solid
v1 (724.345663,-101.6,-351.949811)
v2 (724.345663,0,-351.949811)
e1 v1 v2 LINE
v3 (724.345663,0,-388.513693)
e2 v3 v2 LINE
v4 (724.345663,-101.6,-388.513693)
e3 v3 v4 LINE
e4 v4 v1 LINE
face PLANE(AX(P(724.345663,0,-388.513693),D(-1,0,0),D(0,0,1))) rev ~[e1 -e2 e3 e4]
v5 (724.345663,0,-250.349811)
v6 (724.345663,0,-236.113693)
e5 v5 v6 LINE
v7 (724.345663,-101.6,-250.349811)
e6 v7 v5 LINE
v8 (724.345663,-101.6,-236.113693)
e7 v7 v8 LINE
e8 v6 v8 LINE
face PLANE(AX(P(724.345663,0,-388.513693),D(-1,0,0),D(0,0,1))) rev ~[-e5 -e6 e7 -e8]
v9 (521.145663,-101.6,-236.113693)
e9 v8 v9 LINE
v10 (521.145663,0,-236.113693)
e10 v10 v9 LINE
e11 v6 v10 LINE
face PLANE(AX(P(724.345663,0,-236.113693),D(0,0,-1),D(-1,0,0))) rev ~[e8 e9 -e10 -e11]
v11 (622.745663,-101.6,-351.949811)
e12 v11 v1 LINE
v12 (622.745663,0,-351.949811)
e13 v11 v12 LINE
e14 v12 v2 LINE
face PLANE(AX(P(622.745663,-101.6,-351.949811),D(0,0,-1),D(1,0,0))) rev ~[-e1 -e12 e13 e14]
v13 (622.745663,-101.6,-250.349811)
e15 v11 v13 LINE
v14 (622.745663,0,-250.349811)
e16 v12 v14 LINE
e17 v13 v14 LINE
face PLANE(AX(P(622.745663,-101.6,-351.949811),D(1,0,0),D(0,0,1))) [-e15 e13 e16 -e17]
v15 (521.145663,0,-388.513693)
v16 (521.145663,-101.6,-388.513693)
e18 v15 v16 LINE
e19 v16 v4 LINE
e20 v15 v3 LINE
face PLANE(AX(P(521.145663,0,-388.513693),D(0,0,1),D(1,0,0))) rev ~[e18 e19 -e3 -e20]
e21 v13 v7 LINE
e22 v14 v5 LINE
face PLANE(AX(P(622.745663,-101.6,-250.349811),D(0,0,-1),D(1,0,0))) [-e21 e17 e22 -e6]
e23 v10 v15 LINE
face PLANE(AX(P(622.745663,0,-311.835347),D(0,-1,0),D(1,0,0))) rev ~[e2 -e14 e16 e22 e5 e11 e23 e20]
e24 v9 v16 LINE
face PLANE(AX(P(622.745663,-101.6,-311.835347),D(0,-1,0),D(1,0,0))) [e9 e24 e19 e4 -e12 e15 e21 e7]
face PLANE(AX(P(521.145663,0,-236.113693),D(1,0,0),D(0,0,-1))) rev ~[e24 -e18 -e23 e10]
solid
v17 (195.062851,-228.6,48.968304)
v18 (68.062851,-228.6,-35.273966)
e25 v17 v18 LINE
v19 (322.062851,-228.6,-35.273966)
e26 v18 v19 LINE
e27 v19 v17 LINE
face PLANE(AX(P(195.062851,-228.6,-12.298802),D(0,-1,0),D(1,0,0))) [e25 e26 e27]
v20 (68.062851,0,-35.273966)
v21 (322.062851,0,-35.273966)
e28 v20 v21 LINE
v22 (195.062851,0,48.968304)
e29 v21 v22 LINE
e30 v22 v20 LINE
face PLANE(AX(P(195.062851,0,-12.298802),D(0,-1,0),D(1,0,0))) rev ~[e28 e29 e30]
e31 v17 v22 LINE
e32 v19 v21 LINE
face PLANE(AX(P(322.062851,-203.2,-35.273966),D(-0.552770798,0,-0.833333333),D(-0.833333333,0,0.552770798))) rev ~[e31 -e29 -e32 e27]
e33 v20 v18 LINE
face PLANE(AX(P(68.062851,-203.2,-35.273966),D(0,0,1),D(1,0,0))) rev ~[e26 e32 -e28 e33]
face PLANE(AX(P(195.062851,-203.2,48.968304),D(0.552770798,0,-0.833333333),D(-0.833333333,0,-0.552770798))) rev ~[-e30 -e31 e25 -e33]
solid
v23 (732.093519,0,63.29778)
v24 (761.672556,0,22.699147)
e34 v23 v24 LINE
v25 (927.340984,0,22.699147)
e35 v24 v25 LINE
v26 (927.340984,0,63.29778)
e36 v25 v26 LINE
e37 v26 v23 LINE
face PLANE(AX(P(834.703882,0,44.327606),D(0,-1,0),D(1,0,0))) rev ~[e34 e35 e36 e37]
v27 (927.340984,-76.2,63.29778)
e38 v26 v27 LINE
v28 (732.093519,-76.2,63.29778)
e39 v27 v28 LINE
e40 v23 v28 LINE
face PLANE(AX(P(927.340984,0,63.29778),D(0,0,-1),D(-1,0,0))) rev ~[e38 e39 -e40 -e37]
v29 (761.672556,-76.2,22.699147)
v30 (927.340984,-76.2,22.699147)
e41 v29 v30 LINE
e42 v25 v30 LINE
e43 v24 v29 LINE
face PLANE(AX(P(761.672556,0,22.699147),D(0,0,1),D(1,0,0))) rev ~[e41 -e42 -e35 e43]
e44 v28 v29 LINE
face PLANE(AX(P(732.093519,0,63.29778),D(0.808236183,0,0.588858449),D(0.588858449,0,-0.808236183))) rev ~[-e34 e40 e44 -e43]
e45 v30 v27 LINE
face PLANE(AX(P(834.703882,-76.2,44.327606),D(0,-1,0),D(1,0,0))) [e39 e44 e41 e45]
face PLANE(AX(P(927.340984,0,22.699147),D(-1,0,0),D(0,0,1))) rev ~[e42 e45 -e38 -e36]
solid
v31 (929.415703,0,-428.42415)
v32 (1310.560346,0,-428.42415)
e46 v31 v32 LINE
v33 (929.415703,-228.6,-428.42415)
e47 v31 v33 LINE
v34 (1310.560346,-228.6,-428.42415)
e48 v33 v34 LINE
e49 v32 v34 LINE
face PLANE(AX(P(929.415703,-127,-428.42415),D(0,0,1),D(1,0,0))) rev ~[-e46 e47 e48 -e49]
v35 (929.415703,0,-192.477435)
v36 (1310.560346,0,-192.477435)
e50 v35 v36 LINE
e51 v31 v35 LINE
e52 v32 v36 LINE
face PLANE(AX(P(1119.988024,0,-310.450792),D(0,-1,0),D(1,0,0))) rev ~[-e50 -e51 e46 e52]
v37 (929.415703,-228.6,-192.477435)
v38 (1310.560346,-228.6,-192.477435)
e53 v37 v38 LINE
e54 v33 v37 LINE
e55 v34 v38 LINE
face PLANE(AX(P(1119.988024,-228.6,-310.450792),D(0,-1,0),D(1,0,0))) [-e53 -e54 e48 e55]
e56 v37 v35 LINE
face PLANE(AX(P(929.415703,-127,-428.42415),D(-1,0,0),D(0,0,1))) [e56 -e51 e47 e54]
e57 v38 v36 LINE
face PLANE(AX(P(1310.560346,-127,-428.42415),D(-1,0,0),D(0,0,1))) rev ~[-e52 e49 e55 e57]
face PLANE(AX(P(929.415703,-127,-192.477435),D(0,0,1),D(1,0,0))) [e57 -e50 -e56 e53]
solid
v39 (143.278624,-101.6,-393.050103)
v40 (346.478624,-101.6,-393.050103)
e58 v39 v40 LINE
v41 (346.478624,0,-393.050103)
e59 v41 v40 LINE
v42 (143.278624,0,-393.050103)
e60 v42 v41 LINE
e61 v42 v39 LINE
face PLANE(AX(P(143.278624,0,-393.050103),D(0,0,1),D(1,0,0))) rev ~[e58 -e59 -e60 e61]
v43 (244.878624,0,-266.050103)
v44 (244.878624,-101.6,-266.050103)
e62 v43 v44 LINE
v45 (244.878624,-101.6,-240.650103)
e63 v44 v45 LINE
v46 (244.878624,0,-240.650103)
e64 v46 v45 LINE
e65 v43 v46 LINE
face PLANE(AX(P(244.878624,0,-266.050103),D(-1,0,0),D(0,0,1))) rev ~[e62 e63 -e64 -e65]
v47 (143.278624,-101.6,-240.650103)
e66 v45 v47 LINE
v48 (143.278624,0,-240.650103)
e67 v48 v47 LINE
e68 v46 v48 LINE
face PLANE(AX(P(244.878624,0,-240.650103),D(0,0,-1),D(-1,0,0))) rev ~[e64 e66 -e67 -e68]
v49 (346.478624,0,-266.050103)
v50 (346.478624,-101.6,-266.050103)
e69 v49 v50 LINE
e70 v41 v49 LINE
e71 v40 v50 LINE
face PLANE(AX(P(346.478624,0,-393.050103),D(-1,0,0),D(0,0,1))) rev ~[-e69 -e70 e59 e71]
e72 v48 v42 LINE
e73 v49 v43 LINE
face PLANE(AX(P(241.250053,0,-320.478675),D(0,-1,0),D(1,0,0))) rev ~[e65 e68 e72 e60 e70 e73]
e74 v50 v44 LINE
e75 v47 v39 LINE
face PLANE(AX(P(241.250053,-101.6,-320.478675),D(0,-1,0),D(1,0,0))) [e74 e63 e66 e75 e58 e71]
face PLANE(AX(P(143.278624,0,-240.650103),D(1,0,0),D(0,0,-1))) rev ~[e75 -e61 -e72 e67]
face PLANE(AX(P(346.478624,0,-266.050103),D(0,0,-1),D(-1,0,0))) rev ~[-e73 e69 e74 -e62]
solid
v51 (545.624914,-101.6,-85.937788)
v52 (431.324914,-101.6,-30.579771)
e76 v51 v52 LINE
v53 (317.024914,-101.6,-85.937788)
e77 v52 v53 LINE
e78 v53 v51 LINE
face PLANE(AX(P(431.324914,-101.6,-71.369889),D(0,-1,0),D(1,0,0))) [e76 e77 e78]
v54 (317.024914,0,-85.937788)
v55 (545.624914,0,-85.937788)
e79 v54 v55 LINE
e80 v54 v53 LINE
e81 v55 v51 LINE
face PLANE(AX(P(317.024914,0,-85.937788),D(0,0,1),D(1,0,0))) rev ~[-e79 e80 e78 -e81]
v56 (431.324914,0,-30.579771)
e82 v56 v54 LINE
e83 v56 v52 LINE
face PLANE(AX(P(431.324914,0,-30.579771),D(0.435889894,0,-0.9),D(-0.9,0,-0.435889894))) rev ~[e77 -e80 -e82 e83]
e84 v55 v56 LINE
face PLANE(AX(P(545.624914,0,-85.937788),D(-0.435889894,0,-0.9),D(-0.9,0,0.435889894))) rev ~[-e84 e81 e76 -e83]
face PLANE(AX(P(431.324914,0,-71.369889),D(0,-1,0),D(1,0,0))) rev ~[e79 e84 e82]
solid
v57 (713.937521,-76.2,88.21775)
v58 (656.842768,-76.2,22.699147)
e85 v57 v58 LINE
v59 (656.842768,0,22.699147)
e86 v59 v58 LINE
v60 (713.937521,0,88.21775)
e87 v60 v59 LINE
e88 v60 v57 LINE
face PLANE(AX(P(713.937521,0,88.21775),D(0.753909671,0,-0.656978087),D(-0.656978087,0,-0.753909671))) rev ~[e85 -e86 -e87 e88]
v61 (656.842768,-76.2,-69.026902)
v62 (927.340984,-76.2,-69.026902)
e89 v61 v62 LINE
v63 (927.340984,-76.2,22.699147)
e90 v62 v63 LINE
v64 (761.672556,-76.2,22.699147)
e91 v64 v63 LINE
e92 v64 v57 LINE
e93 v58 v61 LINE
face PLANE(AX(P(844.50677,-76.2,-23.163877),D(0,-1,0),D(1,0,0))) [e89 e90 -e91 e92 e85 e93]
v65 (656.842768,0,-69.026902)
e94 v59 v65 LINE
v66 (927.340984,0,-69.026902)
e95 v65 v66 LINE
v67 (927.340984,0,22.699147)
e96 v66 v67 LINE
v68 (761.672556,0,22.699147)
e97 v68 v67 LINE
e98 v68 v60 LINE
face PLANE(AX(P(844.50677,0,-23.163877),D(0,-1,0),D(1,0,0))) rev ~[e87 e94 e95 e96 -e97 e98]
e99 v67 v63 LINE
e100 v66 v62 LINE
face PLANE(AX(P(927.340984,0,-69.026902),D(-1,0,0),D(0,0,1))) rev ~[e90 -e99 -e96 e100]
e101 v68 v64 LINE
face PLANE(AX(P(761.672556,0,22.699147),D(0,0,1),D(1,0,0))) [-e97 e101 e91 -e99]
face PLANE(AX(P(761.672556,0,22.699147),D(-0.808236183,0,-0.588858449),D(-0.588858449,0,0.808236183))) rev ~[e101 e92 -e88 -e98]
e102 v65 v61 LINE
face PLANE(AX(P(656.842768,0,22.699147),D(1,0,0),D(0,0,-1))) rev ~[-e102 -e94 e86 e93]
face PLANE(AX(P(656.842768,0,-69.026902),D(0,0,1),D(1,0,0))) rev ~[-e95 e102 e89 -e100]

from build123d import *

# Parameters (mm, degrees)
F1_DEPTH  = 127
F4_DEPTH  = 76.2
F6_DEPTH  = 25.4
F8_DEPTH  = 101.6
F9_W      = 165.6684279442
F9_H      = 91.7260497808
F11_DEPTH = 76.2
F13_DEPTH = 101.6
F14_W     = 101.6
F14_H     = 101.6
F15_DEPTH = 101.6
F16_W     = 101.6
F16_H     = 101.6
F17_DEPTH = 127
F18_W     = 381.1446428299
F18_H     = 235.9467148781
F20_DEPTH = 127
F21_W     = 381.1446428299
F21_H     = 235.9467148781
F19_W     = 381.1446428299
F19_H     = 235.9467148781
F23_DEPTH = 101.6


with BuildPart() as f1:
    # F0 (on Front) → F1 (new body)
    with BuildSketch(Plane.XZ):
        Polygon((195.0628506741, 48.968303573), (68.0628506741, -35.273966102), (322.0628506741, -35.273966102), align=None)
    extrude(amount=F1_DEPTH)

    # F2 (on face) → F4 (join)
    with BuildSketch(Plane.XZ.offset(127)):
        Polygon((68.0628506741, -35.273966102), (322.0628506741, -35.273966102), (195.0628506741, 48.968303573), align=None)
    extrude(amount=F4_DEPTH)

    # F5 (on face) → F6 (join)
    with BuildSketch(Plane.XZ.offset(203.2)):
        Polygon((195.0628506741, 48.968303573), (68.0628506741, -35.273966102), (322.0628506741, -35.273966102), align=None)
    extrude(amount=F6_DEPTH)


with BuildPart() as f8:
    # F7 (on Front) → F8 (new body)
    with BuildSketch(Plane.XZ):
        Polygon((545.6249140978, -85.9377876582), (431.3249140978, -30.5797710753), (317.0249140978, -85.9377876582), align=None)
    extrude(amount=F8_DEPTH)


with BuildPart() as f11:
    # F9 (on Front) → F11 (new body)
    with BuildSketch(Plane.XZ):
        with Locations((844.5067703724, -23.1638774276)):
            Rectangle(F9_W, F9_H)
        Polygon((713.9375209808, 88.2177501917), (656.8427681923, 22.6991474628), (656.8427681923, -69.026902318), (761.6725564003, -69.026902318), (761.6725564003, 22.6991474628), (732.0935192904, 63.2977804056), align=None)
    extrude(amount=F11_DEPTH)


with BuildPart() as f11b:
    # F10 (on face) → F11, piece 2 (new body)
    with BuildSketch(Plane.XZ):
        Polygon((927.3409843445, 22.6991474628), (927.3409843445, 63.2977804056), (732.0935192904, 63.2977804056), (761.6725564003, 22.6991474628), align=None)
    extrude(amount=F11_DEPTH)


with BuildPart() as f13:
    # F12 (on Front) → F13 (new body)
    with BuildSketch(Plane.XZ):
        Polygon((244.8786242905, -240.6501034379), (143.2786242905, -240.6501034379), (143.2786242905, -393.0501034379), (346.4786242905, -393.0501034379), (346.4786242905, -266.0501034379), (244.8786242905, -266.0501034379), align=None)
    extrude(amount=F13_DEPTH)


with BuildPart() as f15:
    # F14 (on Front) → F15 (new body)
    with BuildSketch(Plane.XZ):
        Polygon((724.3456629276, -236.1136930588), (521.1456629276, -236.1136930588), (521.1456629276, -388.5136930588), (724.3456629276, -388.5136930588), (724.3456629276, -360.9611363416), (622.7456629276, -360.9611363416), (622.7456629276, -259.3611363416), (724.3456629276, -259.3611363416), align=None)
        with Locations((673.5456629276, -310.1611363416)):
            Rectangle(F14_W, F14_H)
    extrude(amount=F15_DEPTH)

    # F16 (on face) → F17 (cut)
    with BuildSketch(Plane.XZ.offset(101.6)):
        with Locations((673.5456629276, -301.1498109818)):
            Rectangle(F16_W, F16_H)
    extrude(amount=-F17_DEPTH, mode=Mode.SUBTRACT)


with BuildPart() as f20:
    # F18 (on Front) → F20 (new body)
    with BuildSketch(Plane.XZ):
        with Locations((1119.9880242348, -310.4507923126)):
            Rectangle(F18_W, F18_H)
    extrude(amount=F20_DEPTH)

    # F21 (on face) + F19 (on face) → F23 (join)
    with BuildSketch(Plane.XZ.offset(127)):
        with Locations((1119.9880242348, -310.4507923126)):
            Rectangle(F21_W, F21_H)
    with BuildSketch(Plane.XZ):
        with Locations((1119.9880242348, -310.4507923126)):
            Rectangle(F19_W, F19_H)
    extrude(amount=F23_DEPTH)


solid = Compound([f1.part, f8.part, f11.part, f11b.part, f13.part, f15.part, f20.part])
